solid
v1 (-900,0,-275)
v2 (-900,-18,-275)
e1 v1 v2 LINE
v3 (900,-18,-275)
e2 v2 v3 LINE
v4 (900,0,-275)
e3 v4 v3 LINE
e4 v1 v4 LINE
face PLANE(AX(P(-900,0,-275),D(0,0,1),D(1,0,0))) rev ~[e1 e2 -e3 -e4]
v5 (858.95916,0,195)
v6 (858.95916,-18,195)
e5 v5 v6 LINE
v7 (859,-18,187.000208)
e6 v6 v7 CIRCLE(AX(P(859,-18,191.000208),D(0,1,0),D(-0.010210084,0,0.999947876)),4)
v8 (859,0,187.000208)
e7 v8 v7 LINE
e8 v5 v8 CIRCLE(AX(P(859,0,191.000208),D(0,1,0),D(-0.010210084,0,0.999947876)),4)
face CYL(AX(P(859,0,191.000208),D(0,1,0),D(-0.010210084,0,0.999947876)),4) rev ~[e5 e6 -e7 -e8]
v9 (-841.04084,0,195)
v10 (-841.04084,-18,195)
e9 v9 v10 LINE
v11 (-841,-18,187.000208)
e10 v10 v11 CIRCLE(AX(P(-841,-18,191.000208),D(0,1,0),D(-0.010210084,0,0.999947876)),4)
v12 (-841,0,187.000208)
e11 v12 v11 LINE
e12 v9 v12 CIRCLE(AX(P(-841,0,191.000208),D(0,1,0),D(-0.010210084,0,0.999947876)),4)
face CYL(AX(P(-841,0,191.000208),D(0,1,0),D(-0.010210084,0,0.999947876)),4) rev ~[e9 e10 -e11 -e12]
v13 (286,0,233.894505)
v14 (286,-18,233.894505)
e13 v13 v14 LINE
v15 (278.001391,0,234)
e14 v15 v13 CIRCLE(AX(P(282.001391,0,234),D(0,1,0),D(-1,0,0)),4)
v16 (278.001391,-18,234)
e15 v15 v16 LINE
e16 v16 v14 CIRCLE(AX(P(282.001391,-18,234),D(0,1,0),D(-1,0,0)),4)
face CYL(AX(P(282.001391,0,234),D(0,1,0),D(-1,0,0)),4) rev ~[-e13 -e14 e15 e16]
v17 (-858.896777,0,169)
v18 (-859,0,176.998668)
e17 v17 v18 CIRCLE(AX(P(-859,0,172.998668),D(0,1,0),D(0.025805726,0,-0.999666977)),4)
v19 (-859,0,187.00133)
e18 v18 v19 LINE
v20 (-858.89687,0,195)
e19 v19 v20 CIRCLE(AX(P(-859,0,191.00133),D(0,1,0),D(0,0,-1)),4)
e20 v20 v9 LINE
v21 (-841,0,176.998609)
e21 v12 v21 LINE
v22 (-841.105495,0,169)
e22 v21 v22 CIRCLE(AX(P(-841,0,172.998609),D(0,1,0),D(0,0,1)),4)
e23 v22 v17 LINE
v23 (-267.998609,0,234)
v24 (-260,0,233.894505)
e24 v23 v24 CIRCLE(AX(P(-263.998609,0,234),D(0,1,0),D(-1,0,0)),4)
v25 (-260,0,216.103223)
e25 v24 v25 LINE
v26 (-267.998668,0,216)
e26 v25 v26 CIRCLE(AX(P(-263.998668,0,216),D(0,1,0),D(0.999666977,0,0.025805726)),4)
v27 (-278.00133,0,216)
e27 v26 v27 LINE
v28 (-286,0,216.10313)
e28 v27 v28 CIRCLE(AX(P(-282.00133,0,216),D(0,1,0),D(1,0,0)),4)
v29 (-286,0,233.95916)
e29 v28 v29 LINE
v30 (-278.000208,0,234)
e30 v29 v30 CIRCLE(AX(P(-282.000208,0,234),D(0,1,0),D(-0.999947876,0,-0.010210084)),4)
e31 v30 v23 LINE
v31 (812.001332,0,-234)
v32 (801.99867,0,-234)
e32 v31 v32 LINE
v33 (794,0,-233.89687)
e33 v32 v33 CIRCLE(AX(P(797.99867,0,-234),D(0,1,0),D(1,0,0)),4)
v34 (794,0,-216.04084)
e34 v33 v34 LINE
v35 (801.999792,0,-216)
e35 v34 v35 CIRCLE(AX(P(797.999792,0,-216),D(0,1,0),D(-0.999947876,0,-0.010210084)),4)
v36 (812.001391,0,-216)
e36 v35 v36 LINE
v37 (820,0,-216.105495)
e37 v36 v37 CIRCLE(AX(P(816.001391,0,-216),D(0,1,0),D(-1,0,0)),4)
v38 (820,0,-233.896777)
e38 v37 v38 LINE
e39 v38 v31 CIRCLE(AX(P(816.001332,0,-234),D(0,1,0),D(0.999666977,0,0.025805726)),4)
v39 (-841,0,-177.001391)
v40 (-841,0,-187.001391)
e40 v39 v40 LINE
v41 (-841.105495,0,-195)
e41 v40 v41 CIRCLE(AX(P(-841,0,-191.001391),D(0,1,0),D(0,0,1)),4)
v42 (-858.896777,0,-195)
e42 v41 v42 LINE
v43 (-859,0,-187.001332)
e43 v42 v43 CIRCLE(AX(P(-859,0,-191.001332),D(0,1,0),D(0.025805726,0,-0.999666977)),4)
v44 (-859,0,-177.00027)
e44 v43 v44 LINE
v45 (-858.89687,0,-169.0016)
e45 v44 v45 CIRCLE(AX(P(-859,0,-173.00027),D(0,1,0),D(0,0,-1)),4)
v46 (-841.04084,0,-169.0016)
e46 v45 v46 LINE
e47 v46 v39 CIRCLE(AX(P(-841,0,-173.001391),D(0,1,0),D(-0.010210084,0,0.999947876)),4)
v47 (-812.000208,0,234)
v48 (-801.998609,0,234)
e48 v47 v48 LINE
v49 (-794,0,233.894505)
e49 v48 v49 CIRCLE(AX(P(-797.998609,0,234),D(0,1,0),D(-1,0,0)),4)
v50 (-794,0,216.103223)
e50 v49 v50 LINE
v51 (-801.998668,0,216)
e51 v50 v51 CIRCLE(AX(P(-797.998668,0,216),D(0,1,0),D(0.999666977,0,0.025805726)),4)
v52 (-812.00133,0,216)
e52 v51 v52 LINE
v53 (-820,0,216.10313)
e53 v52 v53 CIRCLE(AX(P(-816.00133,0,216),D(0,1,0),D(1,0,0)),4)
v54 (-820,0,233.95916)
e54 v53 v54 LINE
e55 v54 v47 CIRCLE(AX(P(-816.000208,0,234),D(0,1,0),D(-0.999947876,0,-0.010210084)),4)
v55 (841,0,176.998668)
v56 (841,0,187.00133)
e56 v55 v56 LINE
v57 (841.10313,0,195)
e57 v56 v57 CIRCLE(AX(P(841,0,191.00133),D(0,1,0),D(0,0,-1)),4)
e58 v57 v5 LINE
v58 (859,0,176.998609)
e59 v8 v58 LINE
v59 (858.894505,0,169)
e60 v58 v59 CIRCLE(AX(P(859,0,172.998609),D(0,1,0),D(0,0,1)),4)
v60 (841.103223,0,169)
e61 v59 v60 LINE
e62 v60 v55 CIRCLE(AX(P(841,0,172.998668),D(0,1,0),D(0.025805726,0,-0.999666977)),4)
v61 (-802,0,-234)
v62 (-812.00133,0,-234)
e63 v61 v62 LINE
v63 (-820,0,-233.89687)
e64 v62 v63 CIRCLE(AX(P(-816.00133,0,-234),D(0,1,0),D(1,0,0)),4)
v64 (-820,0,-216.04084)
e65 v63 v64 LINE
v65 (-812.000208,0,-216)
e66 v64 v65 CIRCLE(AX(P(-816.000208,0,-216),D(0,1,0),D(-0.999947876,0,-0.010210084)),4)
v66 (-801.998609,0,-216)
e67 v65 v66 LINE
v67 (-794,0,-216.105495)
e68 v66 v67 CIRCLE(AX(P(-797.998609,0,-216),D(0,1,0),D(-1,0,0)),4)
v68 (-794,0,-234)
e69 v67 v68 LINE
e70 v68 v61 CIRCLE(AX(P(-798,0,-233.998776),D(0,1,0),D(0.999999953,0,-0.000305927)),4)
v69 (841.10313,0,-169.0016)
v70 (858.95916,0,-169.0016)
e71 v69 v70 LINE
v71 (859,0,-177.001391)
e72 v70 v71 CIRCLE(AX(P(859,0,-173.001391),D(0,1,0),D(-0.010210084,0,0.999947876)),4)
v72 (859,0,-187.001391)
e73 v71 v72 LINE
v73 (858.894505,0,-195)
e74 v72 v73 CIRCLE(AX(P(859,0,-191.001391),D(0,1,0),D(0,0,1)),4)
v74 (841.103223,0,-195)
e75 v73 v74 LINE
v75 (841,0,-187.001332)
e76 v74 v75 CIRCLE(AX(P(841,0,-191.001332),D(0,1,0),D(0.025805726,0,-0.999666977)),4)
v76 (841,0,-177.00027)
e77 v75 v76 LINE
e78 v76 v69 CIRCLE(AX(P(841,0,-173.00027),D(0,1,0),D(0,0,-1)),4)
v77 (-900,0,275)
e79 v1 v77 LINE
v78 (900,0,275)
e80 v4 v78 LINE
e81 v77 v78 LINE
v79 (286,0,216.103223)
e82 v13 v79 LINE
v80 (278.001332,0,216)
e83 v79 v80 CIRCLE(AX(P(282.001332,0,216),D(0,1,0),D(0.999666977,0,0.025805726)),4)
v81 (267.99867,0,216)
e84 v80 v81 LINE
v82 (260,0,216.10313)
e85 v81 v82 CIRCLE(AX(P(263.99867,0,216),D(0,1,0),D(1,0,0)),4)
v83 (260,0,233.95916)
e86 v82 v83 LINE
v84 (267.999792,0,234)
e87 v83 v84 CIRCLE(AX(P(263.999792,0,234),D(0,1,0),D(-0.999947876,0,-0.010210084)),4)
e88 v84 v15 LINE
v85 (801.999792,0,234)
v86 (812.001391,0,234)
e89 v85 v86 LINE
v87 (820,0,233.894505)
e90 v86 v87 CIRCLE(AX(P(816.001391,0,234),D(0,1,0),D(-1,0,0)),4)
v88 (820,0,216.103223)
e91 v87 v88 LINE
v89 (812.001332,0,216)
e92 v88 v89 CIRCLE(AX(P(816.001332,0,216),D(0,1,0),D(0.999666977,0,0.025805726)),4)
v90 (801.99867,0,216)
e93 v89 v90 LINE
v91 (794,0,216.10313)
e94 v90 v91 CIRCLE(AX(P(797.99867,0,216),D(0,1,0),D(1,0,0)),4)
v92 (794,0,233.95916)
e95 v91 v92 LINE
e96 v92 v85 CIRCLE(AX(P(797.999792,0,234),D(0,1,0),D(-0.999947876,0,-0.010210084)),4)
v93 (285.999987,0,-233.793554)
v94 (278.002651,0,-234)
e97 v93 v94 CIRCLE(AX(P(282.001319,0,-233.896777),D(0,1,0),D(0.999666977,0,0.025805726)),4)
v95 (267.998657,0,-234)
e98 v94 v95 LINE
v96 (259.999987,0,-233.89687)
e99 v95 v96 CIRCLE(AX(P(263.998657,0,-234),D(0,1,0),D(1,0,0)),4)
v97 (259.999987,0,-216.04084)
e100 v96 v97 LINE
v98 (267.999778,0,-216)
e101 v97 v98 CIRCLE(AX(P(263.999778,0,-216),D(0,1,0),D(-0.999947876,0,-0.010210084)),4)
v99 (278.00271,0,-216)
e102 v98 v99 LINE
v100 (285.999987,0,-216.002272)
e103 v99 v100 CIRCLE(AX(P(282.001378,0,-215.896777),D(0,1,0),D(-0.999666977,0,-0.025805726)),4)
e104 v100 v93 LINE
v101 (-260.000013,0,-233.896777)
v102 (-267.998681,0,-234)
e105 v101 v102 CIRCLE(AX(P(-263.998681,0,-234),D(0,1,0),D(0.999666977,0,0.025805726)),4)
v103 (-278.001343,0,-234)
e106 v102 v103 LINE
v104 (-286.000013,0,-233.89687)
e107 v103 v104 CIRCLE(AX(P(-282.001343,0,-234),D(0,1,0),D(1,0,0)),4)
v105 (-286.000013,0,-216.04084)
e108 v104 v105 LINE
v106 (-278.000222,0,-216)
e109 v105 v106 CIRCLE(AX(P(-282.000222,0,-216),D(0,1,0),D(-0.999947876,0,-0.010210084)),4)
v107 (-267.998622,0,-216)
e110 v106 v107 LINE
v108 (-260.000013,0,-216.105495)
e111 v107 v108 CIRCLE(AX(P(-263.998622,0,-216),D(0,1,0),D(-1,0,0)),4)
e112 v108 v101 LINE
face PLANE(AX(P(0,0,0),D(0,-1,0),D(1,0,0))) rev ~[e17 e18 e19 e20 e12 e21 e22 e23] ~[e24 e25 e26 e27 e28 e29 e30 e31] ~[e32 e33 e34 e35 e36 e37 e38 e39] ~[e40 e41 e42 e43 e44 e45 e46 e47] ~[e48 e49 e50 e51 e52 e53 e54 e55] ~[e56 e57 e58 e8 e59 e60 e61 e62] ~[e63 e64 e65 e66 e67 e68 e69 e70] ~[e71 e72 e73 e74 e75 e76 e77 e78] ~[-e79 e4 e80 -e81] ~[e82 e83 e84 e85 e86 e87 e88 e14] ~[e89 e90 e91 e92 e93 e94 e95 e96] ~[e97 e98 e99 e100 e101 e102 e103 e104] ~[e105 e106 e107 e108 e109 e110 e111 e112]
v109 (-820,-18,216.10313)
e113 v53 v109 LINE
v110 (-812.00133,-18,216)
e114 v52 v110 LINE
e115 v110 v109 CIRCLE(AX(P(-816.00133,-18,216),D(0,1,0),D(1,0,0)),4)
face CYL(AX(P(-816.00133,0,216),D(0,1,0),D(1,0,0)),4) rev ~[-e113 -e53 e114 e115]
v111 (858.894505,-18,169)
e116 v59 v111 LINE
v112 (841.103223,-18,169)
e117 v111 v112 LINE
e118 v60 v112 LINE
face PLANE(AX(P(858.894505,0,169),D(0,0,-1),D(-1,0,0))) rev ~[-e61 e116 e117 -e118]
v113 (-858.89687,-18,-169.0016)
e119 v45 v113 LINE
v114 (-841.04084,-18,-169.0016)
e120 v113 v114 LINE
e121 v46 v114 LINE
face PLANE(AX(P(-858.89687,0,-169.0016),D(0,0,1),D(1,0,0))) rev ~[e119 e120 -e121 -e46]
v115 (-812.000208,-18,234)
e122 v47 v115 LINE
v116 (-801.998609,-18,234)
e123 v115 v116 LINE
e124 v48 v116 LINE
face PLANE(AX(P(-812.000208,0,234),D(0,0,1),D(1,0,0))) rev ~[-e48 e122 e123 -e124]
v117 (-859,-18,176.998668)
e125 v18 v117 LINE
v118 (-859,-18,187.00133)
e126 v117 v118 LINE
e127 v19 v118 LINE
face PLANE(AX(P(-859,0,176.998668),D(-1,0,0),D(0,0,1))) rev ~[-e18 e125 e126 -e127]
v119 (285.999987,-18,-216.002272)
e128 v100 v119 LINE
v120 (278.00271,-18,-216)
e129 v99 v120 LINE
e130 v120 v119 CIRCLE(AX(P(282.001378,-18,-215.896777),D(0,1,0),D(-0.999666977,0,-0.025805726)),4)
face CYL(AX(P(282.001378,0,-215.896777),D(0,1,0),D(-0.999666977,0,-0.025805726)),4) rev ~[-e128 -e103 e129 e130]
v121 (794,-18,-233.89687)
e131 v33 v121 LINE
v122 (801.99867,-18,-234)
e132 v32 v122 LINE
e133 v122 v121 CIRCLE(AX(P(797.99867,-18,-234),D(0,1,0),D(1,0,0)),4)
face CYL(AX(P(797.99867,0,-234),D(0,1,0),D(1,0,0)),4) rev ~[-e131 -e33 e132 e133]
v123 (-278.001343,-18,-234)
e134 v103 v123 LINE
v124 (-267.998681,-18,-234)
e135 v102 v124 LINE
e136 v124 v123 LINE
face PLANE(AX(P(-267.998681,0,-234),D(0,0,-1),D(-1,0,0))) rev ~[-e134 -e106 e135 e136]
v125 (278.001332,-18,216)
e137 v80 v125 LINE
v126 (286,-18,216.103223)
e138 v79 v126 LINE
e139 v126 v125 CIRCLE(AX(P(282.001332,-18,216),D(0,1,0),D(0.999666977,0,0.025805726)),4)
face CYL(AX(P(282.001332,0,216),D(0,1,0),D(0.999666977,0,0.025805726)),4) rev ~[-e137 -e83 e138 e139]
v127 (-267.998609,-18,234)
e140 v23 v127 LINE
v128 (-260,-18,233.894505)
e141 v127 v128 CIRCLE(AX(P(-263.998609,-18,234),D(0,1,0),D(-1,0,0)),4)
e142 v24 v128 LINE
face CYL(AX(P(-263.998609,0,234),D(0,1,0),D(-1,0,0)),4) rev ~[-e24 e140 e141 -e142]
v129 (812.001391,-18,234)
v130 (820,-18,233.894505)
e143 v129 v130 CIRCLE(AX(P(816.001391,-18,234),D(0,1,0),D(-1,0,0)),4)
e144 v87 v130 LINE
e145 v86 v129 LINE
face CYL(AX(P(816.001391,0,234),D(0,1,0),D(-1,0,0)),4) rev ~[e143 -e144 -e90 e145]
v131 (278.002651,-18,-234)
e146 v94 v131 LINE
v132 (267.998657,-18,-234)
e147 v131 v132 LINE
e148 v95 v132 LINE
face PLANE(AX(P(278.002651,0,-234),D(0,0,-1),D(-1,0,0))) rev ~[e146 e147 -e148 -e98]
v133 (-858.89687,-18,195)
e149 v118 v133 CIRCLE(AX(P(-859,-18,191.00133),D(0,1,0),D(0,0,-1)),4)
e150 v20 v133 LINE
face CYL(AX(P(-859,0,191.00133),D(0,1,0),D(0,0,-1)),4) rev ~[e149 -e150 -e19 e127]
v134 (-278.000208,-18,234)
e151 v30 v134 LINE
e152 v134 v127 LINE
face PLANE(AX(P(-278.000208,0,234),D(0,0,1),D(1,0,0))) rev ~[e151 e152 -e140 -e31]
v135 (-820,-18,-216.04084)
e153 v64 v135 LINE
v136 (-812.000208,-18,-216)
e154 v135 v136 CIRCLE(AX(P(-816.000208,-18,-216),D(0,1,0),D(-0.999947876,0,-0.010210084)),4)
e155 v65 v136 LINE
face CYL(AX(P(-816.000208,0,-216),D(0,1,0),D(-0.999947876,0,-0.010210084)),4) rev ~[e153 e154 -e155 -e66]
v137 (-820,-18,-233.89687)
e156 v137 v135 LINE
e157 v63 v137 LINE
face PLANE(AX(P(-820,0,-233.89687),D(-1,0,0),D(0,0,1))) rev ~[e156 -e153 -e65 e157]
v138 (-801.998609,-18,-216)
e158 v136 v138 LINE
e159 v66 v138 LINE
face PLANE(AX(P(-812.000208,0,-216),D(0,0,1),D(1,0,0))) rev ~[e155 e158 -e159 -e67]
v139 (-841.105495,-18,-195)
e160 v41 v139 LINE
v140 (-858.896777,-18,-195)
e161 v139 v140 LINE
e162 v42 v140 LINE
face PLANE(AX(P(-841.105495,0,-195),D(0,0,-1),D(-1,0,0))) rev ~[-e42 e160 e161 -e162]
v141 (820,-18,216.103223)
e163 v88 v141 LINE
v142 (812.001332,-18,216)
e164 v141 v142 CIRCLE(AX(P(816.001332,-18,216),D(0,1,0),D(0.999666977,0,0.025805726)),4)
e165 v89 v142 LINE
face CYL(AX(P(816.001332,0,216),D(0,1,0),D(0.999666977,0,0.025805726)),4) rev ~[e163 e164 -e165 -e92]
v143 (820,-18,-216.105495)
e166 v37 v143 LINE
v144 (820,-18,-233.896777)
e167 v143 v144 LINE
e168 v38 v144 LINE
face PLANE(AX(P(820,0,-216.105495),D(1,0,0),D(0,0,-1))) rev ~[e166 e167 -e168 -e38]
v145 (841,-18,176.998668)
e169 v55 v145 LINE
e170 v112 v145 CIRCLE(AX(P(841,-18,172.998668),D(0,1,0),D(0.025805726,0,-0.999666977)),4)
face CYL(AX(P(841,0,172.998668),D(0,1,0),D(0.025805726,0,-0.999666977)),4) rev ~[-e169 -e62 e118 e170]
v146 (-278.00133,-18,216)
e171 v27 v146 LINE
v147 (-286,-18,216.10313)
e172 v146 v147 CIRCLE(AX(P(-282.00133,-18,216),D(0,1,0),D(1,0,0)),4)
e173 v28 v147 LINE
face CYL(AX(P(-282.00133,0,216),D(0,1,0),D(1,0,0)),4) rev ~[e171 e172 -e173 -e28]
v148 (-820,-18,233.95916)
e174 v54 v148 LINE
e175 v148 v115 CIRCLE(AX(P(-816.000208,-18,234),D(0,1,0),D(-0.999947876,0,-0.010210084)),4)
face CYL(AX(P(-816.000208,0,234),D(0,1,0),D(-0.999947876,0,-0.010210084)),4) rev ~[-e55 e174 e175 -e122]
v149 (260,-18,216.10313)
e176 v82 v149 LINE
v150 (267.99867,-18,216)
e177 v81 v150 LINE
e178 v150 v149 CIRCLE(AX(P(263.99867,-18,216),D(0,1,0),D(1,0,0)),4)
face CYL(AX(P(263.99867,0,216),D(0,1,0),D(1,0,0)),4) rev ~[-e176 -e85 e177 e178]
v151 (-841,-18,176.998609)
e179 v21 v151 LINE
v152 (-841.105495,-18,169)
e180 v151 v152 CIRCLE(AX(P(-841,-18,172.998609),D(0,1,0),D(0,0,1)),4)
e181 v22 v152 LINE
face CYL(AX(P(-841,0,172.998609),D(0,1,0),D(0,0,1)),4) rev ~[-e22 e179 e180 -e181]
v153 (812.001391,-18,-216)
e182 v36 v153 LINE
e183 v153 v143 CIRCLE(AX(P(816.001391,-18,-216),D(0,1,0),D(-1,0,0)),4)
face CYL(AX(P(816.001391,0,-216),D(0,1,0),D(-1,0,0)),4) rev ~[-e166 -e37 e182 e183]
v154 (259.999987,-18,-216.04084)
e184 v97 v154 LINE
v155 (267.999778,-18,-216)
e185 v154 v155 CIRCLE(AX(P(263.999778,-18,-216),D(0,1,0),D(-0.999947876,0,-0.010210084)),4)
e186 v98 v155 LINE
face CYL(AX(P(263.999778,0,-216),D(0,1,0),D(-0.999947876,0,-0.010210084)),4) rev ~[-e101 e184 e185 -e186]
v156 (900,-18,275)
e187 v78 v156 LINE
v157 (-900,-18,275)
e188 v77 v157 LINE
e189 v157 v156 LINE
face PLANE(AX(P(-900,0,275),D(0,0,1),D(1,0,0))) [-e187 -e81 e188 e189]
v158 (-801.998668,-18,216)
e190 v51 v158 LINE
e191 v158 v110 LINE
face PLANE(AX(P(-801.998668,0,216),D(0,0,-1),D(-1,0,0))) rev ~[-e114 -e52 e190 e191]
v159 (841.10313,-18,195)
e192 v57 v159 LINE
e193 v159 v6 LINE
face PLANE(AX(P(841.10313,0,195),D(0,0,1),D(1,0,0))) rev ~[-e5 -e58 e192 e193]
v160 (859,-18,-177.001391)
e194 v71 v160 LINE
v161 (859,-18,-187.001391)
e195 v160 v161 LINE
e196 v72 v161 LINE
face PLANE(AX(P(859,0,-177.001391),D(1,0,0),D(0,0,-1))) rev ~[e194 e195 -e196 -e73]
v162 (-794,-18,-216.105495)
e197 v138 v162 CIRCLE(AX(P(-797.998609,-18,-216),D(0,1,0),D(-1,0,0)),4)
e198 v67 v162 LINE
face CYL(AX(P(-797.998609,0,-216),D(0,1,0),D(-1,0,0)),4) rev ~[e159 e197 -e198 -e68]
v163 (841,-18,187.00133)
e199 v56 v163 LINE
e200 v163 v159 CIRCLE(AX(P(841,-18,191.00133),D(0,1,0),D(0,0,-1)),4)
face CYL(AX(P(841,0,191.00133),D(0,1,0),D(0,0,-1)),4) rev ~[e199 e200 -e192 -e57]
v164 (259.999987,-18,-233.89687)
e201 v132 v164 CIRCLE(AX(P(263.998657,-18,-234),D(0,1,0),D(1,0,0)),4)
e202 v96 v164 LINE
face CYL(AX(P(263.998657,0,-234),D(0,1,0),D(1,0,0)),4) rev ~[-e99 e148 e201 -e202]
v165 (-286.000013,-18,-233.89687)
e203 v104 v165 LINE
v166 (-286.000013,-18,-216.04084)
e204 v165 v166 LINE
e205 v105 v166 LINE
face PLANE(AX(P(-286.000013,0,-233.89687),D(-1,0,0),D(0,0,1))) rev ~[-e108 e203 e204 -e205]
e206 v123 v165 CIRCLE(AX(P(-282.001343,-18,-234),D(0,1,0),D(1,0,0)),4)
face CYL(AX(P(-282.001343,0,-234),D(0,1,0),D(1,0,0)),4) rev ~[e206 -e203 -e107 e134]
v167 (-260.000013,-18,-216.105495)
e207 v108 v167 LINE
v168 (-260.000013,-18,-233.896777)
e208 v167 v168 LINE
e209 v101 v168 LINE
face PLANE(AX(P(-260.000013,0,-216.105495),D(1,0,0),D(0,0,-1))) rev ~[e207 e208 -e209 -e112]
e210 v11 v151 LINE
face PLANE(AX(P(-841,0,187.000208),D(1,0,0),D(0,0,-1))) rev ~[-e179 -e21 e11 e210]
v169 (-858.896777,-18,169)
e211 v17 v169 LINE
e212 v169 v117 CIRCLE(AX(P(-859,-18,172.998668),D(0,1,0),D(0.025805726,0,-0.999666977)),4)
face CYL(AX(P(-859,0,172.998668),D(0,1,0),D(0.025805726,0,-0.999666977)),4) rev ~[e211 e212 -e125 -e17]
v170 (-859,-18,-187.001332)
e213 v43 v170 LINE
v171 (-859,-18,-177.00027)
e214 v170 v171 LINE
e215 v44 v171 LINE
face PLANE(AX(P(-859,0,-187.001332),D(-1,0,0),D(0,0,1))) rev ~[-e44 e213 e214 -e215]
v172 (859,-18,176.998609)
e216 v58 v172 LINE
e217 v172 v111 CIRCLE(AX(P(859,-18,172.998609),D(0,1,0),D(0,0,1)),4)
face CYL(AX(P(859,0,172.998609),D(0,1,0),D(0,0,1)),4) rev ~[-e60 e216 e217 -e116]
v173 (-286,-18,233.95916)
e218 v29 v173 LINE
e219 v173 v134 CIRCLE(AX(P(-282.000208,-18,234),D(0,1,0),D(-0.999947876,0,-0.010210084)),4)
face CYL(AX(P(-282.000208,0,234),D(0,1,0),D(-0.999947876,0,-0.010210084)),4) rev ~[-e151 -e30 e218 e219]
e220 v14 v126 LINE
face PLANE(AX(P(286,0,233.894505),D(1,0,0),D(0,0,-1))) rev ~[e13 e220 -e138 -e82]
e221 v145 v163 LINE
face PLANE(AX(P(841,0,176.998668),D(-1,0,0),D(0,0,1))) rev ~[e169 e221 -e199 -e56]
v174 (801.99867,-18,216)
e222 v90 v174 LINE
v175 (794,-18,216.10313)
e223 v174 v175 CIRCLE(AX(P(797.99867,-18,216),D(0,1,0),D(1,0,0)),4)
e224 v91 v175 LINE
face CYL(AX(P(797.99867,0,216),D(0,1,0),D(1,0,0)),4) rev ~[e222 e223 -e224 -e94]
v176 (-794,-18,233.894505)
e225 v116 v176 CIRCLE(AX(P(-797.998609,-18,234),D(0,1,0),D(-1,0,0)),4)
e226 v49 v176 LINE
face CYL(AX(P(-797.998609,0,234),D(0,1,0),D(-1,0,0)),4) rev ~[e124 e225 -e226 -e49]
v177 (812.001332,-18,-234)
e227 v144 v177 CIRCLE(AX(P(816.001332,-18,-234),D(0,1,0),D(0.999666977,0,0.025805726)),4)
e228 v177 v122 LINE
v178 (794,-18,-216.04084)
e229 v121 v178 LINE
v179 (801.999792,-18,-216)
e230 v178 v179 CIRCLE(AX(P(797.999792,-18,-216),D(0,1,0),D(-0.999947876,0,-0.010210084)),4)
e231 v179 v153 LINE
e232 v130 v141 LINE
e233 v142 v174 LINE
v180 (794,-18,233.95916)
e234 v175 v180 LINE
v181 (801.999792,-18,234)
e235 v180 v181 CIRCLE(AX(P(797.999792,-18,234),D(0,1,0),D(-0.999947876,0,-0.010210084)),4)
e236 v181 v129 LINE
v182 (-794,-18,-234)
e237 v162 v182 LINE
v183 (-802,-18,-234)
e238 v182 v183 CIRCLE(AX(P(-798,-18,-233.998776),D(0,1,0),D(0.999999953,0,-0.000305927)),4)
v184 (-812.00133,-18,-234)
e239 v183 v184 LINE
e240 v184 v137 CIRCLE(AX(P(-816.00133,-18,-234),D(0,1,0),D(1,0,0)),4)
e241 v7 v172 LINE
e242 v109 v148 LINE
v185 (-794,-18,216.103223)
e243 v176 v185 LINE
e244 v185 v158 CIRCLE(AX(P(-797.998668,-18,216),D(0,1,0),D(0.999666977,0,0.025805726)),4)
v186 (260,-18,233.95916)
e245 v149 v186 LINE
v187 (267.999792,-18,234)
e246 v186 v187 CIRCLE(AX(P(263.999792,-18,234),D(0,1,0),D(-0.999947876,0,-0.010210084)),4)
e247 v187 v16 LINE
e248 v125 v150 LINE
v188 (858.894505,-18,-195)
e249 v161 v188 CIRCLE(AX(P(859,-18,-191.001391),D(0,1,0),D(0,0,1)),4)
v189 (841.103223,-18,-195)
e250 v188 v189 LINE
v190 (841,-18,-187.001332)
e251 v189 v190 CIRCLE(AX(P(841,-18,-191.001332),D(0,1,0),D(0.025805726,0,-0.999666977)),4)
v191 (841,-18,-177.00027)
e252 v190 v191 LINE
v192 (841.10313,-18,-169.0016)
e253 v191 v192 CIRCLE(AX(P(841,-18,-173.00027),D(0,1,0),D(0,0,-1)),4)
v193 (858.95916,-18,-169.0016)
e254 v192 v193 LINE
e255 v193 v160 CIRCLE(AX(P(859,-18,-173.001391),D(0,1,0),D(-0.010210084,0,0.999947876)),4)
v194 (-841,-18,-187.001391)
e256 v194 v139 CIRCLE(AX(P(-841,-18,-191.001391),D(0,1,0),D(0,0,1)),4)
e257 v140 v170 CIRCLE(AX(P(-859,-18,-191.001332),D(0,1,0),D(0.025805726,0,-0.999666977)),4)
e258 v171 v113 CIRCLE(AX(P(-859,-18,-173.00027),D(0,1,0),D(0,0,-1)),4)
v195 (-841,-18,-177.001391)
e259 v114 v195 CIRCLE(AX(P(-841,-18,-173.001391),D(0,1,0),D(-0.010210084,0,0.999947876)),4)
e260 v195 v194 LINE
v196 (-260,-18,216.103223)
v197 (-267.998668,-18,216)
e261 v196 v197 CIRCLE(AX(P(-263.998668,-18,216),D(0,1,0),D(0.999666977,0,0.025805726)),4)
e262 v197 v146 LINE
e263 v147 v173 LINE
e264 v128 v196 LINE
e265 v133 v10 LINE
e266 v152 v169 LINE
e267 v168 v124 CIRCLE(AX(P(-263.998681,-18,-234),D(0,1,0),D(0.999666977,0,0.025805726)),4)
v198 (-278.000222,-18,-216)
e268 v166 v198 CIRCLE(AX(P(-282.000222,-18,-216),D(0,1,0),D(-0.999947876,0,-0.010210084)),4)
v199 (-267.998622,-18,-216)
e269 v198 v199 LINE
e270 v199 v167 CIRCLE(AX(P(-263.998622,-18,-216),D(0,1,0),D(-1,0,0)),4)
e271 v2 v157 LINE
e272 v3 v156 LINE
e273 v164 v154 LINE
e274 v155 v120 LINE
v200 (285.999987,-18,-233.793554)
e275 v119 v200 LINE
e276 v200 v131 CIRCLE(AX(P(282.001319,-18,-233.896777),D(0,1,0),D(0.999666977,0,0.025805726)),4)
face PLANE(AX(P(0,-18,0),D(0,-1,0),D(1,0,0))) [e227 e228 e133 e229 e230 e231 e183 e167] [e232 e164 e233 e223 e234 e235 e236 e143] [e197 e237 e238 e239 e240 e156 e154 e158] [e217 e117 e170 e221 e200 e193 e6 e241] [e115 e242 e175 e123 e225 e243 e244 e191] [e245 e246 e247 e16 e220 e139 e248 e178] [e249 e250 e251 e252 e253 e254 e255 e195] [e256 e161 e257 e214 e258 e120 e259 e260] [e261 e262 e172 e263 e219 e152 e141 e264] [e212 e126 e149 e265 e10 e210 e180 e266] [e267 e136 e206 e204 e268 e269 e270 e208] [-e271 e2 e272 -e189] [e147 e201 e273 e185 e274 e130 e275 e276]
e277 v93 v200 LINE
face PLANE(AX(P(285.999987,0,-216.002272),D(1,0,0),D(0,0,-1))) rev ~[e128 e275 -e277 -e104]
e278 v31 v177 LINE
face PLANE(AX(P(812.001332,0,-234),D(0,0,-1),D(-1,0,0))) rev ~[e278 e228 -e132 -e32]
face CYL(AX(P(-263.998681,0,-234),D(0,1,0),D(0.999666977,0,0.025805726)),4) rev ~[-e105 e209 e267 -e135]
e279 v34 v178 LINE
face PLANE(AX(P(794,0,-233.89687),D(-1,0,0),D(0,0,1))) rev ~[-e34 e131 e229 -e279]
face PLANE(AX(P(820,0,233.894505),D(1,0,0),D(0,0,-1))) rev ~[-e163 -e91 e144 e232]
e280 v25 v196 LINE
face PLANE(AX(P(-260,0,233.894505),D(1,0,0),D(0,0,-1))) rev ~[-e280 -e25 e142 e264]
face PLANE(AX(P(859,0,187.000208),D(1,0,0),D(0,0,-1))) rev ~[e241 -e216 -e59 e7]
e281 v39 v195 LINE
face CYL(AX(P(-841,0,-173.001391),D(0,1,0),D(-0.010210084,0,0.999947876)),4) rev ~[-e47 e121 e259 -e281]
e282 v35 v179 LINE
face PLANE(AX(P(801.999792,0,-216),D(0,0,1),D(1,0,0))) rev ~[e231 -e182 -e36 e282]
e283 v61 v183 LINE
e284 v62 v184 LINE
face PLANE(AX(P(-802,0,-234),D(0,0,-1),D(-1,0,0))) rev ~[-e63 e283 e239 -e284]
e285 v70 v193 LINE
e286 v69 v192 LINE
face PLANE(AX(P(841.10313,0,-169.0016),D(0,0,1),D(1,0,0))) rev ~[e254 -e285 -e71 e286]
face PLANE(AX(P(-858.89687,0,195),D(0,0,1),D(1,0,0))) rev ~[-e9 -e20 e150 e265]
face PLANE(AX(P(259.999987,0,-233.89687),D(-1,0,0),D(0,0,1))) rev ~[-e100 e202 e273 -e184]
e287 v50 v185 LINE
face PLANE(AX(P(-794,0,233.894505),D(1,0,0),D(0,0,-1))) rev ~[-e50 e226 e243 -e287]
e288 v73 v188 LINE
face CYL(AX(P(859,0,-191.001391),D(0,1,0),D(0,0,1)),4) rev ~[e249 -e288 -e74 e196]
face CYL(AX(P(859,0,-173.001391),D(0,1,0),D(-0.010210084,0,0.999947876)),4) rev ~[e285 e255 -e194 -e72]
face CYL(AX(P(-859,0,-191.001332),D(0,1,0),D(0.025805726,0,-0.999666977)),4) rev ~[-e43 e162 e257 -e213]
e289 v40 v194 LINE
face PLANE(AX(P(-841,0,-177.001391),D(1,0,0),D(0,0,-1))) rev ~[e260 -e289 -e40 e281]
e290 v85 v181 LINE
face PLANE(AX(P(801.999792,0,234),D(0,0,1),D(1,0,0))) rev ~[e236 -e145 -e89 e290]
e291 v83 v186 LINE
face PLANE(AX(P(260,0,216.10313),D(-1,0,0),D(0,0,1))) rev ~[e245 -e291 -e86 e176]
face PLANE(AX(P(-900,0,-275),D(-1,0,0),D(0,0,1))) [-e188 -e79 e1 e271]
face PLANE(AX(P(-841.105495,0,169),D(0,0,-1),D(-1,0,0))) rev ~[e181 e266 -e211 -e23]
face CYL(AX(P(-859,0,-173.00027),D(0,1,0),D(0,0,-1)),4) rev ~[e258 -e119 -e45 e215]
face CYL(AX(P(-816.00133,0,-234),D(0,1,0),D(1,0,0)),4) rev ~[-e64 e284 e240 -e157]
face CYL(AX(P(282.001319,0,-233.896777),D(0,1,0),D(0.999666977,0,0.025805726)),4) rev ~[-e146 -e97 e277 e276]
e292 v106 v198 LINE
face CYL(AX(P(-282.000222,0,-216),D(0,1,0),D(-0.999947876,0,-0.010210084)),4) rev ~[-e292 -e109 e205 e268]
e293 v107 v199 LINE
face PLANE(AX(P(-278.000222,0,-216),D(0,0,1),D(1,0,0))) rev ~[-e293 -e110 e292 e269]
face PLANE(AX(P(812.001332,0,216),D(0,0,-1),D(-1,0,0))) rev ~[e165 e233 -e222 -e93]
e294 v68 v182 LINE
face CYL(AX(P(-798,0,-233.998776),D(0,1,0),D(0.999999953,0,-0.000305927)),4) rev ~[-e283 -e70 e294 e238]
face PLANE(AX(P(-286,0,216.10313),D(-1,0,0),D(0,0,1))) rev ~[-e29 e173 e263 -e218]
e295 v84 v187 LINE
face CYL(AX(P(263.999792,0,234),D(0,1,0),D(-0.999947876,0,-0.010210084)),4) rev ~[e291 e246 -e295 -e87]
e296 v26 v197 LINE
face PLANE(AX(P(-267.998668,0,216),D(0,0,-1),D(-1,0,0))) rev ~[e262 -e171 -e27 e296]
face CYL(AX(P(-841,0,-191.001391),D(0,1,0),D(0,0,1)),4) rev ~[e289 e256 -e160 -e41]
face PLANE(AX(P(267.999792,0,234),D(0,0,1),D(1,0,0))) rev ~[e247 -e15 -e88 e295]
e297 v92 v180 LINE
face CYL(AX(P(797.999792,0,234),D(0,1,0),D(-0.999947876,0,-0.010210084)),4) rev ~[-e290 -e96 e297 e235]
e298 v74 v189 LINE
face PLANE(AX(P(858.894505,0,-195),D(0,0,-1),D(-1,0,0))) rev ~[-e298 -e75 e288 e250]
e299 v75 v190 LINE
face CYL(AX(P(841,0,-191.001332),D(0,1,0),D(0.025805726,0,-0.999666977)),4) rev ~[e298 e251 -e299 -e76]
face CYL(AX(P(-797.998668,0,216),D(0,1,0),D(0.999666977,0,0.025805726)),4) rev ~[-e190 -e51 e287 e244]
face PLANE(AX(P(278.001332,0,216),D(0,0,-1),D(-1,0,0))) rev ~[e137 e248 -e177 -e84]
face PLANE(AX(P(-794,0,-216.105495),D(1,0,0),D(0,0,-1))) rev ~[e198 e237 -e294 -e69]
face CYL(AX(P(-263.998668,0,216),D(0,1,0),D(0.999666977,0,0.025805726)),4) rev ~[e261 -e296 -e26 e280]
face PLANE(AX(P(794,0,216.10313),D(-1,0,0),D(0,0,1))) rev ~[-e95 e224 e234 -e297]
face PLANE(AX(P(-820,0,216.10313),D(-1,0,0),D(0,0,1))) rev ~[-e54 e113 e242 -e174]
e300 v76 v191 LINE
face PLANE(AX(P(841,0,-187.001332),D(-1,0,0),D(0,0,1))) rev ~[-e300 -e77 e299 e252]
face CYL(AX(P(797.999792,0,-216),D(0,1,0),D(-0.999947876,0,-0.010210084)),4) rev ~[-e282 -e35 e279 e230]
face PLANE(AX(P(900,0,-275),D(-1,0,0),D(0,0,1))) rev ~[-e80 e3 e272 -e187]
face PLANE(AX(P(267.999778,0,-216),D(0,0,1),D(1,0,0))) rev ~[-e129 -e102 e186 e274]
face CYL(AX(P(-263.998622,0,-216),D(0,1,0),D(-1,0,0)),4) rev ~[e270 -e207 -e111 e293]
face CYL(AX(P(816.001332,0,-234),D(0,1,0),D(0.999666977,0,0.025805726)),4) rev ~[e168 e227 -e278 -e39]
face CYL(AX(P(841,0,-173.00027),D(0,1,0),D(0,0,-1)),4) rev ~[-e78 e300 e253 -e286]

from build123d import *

# Parameters (mm, degrees)
F0_W     = 1800
F0_H     = 550
F1_DEPTH = 18


# Not quite as in the source:
# - ends of sketch curves that miss each other by under 0.0002 mm in the source are joined


with BuildPart() as f1:
    # F0 (on Front) → F1 (new body)
    with BuildSketch(Plane.XZ):
        Rectangle(F0_W, F0_H)
        with BuildLine():
            ThreePointArc((-812.0013296917, -234), (-816.0528989013, -237.9996675633), (-820, -233.8968701525))
            Line((-820, -233.8968701525), (-820, -216.0408403343))
            ThreePointArc((-820, -216.0408403343), (-816.0206289303, -212.0000521246), (-812.000208497, -216))
            Line((-812.000208497, -216), (-801.9986086037, -216))
            ThreePointArc((-801.9986086037, -216), (-797.945856423, -212.0003478642), (-794, -216.1054951861))
            Line((-794, -216.1054951861), (-794, -233.9987762793))
            Line((-794, -233.9987762793), (-794, -233.999999892))
            ThreePointArc((-794, -233.999999892), (-797.999999946, -237.9987762793), (-801.9999998128, -234))
            Line((-801.9999998128, -234), (-812.0013296917, -234))
        make_face(mode=Mode.SUBTRACT)
        with BuildLine():
            ThreePointArc((-859, -177.0002702016), (-862.9996675633, -172.948700992), (-858.8968701525, -169.0015998933))
            Line((-858.8968701525, -169.0015998933), (-841.0408403343, -169.0015998933))
            ThreePointArc((-841.0408403343, -169.0015998933), (-837.0000521246, -172.980970963), (-841, -177.0013913963))
            Line((-841, -177.0013913963), (-841, -187.0013913963))
            ThreePointArc((-841, -187.0013913963), (-837.0003478642, -191.054143577), (-841.1054951861, -195))
            Line((-841.1054951861, -195), (-858.8967770965, -195))
            ThreePointArc((-858.8967770965, -195), (-862.9996669629, -191.052947842), (-859, -187.0013320928))
            Line((-859, -187.0013320928), (-859, -177.0002702016))
        make_face(mode=Mode.SUBTRACT)
        with BuildLine():
            ThreePointArc((-278.0013430431, -234), (-282.0529122528, -237.9996675633), (-286.0000133514, -233.8968701525))
            Line((-286.0000133514, -233.8968701525), (-286.0000133514, -216.0408403343))
            ThreePointArc((-286.0000133514, -216.0408403343), (-282.0206422818, -212.0000521246), (-278.0002218485, -216))
            Line((-278.0002218485, -216), (-267.9986219552, -216))
            ThreePointArc((-267.9986219552, -216), (-263.9458697745, -212.0003478642), (-260.0000133514, -216.1054951861))
            Line((-260.0000133514, -216.1054951861), (-260.0000133514, -233.8967770965))
            ThreePointArc((-260.0000133514, -233.8967770965), (-263.9470655094, -237.9996669629), (-267.9986812587, -234))
            Line((-267.9986812587, -234), (-278.0013430431, -234))
        make_face(mode=Mode.SUBTRACT)
        with BuildLine():
            ThreePointArc((267.9986569569, -234), (263.9470877472, -237.9996675633), (259.9999866486, -233.8968701525))
            Line((259.9999866486, -233.8968701525), (259.9999866486, -216.0408403343))
            ThreePointArc((259.9999866486, -216.0408403343), (263.9793577182, -212.0000521246), (267.9997781515, -216))
            Line((267.9997781515, -216), (278.0027101376, -216))
            ThreePointArc((278.0027101376, -216), (282.002514573, -211.896777258), (285.9999866486, -216.0022722826))
            Line((285.9999866486, -216.0022722826), (285.9999866486, -233.793554193))
            ThreePointArc((285.9999866486, -233.793554193), (282.1045416448, -237.8954450037), (278.0026508341, -234))
            Line((278.0026508341, -234), (267.9986569569, -234))
        make_face(mode=Mode.SUBTRACT)
        with BuildLine():
            ThreePointArc((801.9986703083, -234), (797.9471010987, -237.9996675633), (794, -233.8968701525))
            Line((794, -233.8968701525), (794, -216.0408403343))
            ThreePointArc((794, -216.0408403343), (797.9793710697, -212.0000521246), (801.999791503, -216))
            Line((801.999791503, -216), (812.0013913963, -216))
            ThreePointArc((812.0013913963, -216), (816.054143577, -212.0003478642), (820, -216.1054951861))
            Line((820, -216.1054951861), (820, -233.8967770965))
            ThreePointArc((820, -233.8967770965), (816.052947842, -237.9996669629), (812.0013320928, -234))
            Line((812.0013320928, -234), (801.9986703083, -234))
        make_face(mode=Mode.SUBTRACT)
        with BuildLine():
            ThreePointArc((841, -177.0002702016), (837.0003324367, -172.948700992), (841.1031298475, -169.0015998933))
            Line((841.1031298475, -169.0015998933), (858.9591596657, -169.0015998933))
            ThreePointArc((858.9591596657, -169.0015998933), (862.9999478754, -172.980970963), (859, -177.0013913963))
            Line((859, -177.0013913963), (859, -187.0013913963))
            ThreePointArc((859, -187.0013913963), (862.9996521358, -191.054143577), (858.8945048139, -195))
            Line((858.8945048139, -195), (841.1032229035, -195))
            ThreePointArc((841.1032229035, -195), (837.0003330371, -191.052947842), (841, -187.0013320928))
            Line((841, -187.0013320928), (841, -177.0002702016))
        make_face(mode=Mode.SUBTRACT)
        with BuildLine():
            ThreePointArc((-859, 187.0013296917), (-862.9996675633, 191.0528989013), (-858.8968701525, 195))
            Line((-858.8968701525, 195), (-841.0408403343, 195))
            ThreePointArc((-841.0408403343, 195), (-837.0000521246, 191.0206289303), (-841, 187.000208497))
            Line((-841, 187.000208497), (-841, 176.9986086037))
            ThreePointArc((-841, 176.9986086037), (-837.0003478642, 172.945856423), (-841.1054951861, 169))
            Line((-841.1054951861, 169), (-858.8967770965, 169))
            ThreePointArc((-858.8967770965, 169), (-862.9996669629, 172.947052158), (-859, 176.9986679072))
            Line((-859, 176.9986679072), (-859, 187.0013296917))
        make_face(mode=Mode.SUBTRACT)
        with BuildLine():
            ThreePointArc((-812.0013296917, 216), (-816.0528989013, 212.0003324367), (-820, 216.1031298475))
            Line((-820, 216.1031298475), (-820, 233.9591596657))
            ThreePointArc((-820, 233.9591596657), (-816.0206289303, 237.9999478754), (-812.000208497, 234))
            Line((-812.000208497, 234), (-801.9986086037, 234))
            ThreePointArc((-801.9986086037, 234), (-797.945856423, 237.9996521358), (-794, 233.8945048139))
            Line((-794, 233.8945048139), (-794, 216.1032229035))
            ThreePointArc((-794, 216.1032229035), (-797.947052158, 212.0003330371), (-801.9986679072, 216))
            Line((-801.9986679072, 216), (-812.0013296917, 216))
        make_face(mode=Mode.SUBTRACT)
        with BuildLine():
            ThreePointArc((-278.0013296917, 216), (-282.0528989013, 212.0003324367), (-286, 216.1031298475))
            Line((-286, 216.1031298475), (-286, 233.9591596657))
            ThreePointArc((-286, 233.9591596657), (-282.0206289303, 237.9999478754), (-278.000208497, 234))
            Line((-278.000208497, 234), (-267.9986086037, 234))
            ThreePointArc((-267.9986086037, 234), (-263.945856423, 237.9996521358), (-260, 233.8945048139))
            Line((-260, 233.8945048139), (-260, 216.1032229035))
            ThreePointArc((-260, 216.1032229035), (-263.947052158, 212.0003330371), (-267.9986679072, 216))
            Line((-267.9986679072, 216), (-278.0013296917, 216))
        make_face(mode=Mode.SUBTRACT)
        with BuildLine():
            ThreePointArc((267.9986703083, 216), (263.9471010987, 212.0003324367), (260, 216.1031298475))
            Line((260, 216.1031298475), (260, 233.9591596657))
            ThreePointArc((260, 233.9591596657), (263.9793710697, 237.9999478754), (267.999791503, 234))
            Line((267.999791503, 234), (278.0013913963, 234))
            ThreePointArc((278.0013913963, 234), (282.054143577, 237.9996521358), (286, 233.8945048139))
            Line((286, 233.8945048139), (286, 216.1032229035))
            ThreePointArc((286, 216.1032229035), (282.052947842, 212.0003330371), (278.0013320928, 216))
            Line((278.0013320928, 216), (267.9986703083, 216))
        make_face(mode=Mode.SUBTRACT)
        with BuildLine():
            ThreePointArc((841, 187.0013296917), (837.0003324367, 191.0528989013), (841.1031298475, 195))
            Line((841.1031298475, 195), (858.9591596657, 195))
            ThreePointArc((858.9591596657, 195), (862.9999478754, 191.0206289303), (859, 187.000208497))
            Line((859, 187.000208497), (859, 176.9986086037))
            ThreePointArc((859, 176.9986086037), (862.9996521358, 172.945856423), (858.8945048139, 169))
            Line((858.8945048139, 169), (841.1032229035, 169))
            ThreePointArc((841.1032229035, 169), (837.0003330371, 172.947052158), (841, 176.9986679072))
            Line((841, 176.9986679072), (841, 187.0013296917))
        make_face(mode=Mode.SUBTRACT)
        with BuildLine():
            ThreePointArc((801.9986703083, 216), (797.9471010987, 212.0003324367), (794, 216.1031298475))
            Line((794, 216.1031298475), (794, 233.9591596657))
            ThreePointArc((794, 233.9591596657), (797.9793710697, 237.9999478754), (801.999791503, 234))
            Line((801.999791503, 234), (812.0013913963, 234))
            ThreePointArc((812.0013913963, 234), (816.054143577, 237.9996521358), (820, 233.8945048139))
            Line((820, 233.8945048139), (820, 216.1032229035))
            ThreePointArc((820, 216.1032229035), (816.052947842, 212.0003330371), (812.0013320928, 216))
            Line((812.0013320928, 216), (801.9986703083, 216))
        make_face(mode=Mode.SUBTRACT)
    extrude(amount=F1_DEPTH)


solid = f1.part
